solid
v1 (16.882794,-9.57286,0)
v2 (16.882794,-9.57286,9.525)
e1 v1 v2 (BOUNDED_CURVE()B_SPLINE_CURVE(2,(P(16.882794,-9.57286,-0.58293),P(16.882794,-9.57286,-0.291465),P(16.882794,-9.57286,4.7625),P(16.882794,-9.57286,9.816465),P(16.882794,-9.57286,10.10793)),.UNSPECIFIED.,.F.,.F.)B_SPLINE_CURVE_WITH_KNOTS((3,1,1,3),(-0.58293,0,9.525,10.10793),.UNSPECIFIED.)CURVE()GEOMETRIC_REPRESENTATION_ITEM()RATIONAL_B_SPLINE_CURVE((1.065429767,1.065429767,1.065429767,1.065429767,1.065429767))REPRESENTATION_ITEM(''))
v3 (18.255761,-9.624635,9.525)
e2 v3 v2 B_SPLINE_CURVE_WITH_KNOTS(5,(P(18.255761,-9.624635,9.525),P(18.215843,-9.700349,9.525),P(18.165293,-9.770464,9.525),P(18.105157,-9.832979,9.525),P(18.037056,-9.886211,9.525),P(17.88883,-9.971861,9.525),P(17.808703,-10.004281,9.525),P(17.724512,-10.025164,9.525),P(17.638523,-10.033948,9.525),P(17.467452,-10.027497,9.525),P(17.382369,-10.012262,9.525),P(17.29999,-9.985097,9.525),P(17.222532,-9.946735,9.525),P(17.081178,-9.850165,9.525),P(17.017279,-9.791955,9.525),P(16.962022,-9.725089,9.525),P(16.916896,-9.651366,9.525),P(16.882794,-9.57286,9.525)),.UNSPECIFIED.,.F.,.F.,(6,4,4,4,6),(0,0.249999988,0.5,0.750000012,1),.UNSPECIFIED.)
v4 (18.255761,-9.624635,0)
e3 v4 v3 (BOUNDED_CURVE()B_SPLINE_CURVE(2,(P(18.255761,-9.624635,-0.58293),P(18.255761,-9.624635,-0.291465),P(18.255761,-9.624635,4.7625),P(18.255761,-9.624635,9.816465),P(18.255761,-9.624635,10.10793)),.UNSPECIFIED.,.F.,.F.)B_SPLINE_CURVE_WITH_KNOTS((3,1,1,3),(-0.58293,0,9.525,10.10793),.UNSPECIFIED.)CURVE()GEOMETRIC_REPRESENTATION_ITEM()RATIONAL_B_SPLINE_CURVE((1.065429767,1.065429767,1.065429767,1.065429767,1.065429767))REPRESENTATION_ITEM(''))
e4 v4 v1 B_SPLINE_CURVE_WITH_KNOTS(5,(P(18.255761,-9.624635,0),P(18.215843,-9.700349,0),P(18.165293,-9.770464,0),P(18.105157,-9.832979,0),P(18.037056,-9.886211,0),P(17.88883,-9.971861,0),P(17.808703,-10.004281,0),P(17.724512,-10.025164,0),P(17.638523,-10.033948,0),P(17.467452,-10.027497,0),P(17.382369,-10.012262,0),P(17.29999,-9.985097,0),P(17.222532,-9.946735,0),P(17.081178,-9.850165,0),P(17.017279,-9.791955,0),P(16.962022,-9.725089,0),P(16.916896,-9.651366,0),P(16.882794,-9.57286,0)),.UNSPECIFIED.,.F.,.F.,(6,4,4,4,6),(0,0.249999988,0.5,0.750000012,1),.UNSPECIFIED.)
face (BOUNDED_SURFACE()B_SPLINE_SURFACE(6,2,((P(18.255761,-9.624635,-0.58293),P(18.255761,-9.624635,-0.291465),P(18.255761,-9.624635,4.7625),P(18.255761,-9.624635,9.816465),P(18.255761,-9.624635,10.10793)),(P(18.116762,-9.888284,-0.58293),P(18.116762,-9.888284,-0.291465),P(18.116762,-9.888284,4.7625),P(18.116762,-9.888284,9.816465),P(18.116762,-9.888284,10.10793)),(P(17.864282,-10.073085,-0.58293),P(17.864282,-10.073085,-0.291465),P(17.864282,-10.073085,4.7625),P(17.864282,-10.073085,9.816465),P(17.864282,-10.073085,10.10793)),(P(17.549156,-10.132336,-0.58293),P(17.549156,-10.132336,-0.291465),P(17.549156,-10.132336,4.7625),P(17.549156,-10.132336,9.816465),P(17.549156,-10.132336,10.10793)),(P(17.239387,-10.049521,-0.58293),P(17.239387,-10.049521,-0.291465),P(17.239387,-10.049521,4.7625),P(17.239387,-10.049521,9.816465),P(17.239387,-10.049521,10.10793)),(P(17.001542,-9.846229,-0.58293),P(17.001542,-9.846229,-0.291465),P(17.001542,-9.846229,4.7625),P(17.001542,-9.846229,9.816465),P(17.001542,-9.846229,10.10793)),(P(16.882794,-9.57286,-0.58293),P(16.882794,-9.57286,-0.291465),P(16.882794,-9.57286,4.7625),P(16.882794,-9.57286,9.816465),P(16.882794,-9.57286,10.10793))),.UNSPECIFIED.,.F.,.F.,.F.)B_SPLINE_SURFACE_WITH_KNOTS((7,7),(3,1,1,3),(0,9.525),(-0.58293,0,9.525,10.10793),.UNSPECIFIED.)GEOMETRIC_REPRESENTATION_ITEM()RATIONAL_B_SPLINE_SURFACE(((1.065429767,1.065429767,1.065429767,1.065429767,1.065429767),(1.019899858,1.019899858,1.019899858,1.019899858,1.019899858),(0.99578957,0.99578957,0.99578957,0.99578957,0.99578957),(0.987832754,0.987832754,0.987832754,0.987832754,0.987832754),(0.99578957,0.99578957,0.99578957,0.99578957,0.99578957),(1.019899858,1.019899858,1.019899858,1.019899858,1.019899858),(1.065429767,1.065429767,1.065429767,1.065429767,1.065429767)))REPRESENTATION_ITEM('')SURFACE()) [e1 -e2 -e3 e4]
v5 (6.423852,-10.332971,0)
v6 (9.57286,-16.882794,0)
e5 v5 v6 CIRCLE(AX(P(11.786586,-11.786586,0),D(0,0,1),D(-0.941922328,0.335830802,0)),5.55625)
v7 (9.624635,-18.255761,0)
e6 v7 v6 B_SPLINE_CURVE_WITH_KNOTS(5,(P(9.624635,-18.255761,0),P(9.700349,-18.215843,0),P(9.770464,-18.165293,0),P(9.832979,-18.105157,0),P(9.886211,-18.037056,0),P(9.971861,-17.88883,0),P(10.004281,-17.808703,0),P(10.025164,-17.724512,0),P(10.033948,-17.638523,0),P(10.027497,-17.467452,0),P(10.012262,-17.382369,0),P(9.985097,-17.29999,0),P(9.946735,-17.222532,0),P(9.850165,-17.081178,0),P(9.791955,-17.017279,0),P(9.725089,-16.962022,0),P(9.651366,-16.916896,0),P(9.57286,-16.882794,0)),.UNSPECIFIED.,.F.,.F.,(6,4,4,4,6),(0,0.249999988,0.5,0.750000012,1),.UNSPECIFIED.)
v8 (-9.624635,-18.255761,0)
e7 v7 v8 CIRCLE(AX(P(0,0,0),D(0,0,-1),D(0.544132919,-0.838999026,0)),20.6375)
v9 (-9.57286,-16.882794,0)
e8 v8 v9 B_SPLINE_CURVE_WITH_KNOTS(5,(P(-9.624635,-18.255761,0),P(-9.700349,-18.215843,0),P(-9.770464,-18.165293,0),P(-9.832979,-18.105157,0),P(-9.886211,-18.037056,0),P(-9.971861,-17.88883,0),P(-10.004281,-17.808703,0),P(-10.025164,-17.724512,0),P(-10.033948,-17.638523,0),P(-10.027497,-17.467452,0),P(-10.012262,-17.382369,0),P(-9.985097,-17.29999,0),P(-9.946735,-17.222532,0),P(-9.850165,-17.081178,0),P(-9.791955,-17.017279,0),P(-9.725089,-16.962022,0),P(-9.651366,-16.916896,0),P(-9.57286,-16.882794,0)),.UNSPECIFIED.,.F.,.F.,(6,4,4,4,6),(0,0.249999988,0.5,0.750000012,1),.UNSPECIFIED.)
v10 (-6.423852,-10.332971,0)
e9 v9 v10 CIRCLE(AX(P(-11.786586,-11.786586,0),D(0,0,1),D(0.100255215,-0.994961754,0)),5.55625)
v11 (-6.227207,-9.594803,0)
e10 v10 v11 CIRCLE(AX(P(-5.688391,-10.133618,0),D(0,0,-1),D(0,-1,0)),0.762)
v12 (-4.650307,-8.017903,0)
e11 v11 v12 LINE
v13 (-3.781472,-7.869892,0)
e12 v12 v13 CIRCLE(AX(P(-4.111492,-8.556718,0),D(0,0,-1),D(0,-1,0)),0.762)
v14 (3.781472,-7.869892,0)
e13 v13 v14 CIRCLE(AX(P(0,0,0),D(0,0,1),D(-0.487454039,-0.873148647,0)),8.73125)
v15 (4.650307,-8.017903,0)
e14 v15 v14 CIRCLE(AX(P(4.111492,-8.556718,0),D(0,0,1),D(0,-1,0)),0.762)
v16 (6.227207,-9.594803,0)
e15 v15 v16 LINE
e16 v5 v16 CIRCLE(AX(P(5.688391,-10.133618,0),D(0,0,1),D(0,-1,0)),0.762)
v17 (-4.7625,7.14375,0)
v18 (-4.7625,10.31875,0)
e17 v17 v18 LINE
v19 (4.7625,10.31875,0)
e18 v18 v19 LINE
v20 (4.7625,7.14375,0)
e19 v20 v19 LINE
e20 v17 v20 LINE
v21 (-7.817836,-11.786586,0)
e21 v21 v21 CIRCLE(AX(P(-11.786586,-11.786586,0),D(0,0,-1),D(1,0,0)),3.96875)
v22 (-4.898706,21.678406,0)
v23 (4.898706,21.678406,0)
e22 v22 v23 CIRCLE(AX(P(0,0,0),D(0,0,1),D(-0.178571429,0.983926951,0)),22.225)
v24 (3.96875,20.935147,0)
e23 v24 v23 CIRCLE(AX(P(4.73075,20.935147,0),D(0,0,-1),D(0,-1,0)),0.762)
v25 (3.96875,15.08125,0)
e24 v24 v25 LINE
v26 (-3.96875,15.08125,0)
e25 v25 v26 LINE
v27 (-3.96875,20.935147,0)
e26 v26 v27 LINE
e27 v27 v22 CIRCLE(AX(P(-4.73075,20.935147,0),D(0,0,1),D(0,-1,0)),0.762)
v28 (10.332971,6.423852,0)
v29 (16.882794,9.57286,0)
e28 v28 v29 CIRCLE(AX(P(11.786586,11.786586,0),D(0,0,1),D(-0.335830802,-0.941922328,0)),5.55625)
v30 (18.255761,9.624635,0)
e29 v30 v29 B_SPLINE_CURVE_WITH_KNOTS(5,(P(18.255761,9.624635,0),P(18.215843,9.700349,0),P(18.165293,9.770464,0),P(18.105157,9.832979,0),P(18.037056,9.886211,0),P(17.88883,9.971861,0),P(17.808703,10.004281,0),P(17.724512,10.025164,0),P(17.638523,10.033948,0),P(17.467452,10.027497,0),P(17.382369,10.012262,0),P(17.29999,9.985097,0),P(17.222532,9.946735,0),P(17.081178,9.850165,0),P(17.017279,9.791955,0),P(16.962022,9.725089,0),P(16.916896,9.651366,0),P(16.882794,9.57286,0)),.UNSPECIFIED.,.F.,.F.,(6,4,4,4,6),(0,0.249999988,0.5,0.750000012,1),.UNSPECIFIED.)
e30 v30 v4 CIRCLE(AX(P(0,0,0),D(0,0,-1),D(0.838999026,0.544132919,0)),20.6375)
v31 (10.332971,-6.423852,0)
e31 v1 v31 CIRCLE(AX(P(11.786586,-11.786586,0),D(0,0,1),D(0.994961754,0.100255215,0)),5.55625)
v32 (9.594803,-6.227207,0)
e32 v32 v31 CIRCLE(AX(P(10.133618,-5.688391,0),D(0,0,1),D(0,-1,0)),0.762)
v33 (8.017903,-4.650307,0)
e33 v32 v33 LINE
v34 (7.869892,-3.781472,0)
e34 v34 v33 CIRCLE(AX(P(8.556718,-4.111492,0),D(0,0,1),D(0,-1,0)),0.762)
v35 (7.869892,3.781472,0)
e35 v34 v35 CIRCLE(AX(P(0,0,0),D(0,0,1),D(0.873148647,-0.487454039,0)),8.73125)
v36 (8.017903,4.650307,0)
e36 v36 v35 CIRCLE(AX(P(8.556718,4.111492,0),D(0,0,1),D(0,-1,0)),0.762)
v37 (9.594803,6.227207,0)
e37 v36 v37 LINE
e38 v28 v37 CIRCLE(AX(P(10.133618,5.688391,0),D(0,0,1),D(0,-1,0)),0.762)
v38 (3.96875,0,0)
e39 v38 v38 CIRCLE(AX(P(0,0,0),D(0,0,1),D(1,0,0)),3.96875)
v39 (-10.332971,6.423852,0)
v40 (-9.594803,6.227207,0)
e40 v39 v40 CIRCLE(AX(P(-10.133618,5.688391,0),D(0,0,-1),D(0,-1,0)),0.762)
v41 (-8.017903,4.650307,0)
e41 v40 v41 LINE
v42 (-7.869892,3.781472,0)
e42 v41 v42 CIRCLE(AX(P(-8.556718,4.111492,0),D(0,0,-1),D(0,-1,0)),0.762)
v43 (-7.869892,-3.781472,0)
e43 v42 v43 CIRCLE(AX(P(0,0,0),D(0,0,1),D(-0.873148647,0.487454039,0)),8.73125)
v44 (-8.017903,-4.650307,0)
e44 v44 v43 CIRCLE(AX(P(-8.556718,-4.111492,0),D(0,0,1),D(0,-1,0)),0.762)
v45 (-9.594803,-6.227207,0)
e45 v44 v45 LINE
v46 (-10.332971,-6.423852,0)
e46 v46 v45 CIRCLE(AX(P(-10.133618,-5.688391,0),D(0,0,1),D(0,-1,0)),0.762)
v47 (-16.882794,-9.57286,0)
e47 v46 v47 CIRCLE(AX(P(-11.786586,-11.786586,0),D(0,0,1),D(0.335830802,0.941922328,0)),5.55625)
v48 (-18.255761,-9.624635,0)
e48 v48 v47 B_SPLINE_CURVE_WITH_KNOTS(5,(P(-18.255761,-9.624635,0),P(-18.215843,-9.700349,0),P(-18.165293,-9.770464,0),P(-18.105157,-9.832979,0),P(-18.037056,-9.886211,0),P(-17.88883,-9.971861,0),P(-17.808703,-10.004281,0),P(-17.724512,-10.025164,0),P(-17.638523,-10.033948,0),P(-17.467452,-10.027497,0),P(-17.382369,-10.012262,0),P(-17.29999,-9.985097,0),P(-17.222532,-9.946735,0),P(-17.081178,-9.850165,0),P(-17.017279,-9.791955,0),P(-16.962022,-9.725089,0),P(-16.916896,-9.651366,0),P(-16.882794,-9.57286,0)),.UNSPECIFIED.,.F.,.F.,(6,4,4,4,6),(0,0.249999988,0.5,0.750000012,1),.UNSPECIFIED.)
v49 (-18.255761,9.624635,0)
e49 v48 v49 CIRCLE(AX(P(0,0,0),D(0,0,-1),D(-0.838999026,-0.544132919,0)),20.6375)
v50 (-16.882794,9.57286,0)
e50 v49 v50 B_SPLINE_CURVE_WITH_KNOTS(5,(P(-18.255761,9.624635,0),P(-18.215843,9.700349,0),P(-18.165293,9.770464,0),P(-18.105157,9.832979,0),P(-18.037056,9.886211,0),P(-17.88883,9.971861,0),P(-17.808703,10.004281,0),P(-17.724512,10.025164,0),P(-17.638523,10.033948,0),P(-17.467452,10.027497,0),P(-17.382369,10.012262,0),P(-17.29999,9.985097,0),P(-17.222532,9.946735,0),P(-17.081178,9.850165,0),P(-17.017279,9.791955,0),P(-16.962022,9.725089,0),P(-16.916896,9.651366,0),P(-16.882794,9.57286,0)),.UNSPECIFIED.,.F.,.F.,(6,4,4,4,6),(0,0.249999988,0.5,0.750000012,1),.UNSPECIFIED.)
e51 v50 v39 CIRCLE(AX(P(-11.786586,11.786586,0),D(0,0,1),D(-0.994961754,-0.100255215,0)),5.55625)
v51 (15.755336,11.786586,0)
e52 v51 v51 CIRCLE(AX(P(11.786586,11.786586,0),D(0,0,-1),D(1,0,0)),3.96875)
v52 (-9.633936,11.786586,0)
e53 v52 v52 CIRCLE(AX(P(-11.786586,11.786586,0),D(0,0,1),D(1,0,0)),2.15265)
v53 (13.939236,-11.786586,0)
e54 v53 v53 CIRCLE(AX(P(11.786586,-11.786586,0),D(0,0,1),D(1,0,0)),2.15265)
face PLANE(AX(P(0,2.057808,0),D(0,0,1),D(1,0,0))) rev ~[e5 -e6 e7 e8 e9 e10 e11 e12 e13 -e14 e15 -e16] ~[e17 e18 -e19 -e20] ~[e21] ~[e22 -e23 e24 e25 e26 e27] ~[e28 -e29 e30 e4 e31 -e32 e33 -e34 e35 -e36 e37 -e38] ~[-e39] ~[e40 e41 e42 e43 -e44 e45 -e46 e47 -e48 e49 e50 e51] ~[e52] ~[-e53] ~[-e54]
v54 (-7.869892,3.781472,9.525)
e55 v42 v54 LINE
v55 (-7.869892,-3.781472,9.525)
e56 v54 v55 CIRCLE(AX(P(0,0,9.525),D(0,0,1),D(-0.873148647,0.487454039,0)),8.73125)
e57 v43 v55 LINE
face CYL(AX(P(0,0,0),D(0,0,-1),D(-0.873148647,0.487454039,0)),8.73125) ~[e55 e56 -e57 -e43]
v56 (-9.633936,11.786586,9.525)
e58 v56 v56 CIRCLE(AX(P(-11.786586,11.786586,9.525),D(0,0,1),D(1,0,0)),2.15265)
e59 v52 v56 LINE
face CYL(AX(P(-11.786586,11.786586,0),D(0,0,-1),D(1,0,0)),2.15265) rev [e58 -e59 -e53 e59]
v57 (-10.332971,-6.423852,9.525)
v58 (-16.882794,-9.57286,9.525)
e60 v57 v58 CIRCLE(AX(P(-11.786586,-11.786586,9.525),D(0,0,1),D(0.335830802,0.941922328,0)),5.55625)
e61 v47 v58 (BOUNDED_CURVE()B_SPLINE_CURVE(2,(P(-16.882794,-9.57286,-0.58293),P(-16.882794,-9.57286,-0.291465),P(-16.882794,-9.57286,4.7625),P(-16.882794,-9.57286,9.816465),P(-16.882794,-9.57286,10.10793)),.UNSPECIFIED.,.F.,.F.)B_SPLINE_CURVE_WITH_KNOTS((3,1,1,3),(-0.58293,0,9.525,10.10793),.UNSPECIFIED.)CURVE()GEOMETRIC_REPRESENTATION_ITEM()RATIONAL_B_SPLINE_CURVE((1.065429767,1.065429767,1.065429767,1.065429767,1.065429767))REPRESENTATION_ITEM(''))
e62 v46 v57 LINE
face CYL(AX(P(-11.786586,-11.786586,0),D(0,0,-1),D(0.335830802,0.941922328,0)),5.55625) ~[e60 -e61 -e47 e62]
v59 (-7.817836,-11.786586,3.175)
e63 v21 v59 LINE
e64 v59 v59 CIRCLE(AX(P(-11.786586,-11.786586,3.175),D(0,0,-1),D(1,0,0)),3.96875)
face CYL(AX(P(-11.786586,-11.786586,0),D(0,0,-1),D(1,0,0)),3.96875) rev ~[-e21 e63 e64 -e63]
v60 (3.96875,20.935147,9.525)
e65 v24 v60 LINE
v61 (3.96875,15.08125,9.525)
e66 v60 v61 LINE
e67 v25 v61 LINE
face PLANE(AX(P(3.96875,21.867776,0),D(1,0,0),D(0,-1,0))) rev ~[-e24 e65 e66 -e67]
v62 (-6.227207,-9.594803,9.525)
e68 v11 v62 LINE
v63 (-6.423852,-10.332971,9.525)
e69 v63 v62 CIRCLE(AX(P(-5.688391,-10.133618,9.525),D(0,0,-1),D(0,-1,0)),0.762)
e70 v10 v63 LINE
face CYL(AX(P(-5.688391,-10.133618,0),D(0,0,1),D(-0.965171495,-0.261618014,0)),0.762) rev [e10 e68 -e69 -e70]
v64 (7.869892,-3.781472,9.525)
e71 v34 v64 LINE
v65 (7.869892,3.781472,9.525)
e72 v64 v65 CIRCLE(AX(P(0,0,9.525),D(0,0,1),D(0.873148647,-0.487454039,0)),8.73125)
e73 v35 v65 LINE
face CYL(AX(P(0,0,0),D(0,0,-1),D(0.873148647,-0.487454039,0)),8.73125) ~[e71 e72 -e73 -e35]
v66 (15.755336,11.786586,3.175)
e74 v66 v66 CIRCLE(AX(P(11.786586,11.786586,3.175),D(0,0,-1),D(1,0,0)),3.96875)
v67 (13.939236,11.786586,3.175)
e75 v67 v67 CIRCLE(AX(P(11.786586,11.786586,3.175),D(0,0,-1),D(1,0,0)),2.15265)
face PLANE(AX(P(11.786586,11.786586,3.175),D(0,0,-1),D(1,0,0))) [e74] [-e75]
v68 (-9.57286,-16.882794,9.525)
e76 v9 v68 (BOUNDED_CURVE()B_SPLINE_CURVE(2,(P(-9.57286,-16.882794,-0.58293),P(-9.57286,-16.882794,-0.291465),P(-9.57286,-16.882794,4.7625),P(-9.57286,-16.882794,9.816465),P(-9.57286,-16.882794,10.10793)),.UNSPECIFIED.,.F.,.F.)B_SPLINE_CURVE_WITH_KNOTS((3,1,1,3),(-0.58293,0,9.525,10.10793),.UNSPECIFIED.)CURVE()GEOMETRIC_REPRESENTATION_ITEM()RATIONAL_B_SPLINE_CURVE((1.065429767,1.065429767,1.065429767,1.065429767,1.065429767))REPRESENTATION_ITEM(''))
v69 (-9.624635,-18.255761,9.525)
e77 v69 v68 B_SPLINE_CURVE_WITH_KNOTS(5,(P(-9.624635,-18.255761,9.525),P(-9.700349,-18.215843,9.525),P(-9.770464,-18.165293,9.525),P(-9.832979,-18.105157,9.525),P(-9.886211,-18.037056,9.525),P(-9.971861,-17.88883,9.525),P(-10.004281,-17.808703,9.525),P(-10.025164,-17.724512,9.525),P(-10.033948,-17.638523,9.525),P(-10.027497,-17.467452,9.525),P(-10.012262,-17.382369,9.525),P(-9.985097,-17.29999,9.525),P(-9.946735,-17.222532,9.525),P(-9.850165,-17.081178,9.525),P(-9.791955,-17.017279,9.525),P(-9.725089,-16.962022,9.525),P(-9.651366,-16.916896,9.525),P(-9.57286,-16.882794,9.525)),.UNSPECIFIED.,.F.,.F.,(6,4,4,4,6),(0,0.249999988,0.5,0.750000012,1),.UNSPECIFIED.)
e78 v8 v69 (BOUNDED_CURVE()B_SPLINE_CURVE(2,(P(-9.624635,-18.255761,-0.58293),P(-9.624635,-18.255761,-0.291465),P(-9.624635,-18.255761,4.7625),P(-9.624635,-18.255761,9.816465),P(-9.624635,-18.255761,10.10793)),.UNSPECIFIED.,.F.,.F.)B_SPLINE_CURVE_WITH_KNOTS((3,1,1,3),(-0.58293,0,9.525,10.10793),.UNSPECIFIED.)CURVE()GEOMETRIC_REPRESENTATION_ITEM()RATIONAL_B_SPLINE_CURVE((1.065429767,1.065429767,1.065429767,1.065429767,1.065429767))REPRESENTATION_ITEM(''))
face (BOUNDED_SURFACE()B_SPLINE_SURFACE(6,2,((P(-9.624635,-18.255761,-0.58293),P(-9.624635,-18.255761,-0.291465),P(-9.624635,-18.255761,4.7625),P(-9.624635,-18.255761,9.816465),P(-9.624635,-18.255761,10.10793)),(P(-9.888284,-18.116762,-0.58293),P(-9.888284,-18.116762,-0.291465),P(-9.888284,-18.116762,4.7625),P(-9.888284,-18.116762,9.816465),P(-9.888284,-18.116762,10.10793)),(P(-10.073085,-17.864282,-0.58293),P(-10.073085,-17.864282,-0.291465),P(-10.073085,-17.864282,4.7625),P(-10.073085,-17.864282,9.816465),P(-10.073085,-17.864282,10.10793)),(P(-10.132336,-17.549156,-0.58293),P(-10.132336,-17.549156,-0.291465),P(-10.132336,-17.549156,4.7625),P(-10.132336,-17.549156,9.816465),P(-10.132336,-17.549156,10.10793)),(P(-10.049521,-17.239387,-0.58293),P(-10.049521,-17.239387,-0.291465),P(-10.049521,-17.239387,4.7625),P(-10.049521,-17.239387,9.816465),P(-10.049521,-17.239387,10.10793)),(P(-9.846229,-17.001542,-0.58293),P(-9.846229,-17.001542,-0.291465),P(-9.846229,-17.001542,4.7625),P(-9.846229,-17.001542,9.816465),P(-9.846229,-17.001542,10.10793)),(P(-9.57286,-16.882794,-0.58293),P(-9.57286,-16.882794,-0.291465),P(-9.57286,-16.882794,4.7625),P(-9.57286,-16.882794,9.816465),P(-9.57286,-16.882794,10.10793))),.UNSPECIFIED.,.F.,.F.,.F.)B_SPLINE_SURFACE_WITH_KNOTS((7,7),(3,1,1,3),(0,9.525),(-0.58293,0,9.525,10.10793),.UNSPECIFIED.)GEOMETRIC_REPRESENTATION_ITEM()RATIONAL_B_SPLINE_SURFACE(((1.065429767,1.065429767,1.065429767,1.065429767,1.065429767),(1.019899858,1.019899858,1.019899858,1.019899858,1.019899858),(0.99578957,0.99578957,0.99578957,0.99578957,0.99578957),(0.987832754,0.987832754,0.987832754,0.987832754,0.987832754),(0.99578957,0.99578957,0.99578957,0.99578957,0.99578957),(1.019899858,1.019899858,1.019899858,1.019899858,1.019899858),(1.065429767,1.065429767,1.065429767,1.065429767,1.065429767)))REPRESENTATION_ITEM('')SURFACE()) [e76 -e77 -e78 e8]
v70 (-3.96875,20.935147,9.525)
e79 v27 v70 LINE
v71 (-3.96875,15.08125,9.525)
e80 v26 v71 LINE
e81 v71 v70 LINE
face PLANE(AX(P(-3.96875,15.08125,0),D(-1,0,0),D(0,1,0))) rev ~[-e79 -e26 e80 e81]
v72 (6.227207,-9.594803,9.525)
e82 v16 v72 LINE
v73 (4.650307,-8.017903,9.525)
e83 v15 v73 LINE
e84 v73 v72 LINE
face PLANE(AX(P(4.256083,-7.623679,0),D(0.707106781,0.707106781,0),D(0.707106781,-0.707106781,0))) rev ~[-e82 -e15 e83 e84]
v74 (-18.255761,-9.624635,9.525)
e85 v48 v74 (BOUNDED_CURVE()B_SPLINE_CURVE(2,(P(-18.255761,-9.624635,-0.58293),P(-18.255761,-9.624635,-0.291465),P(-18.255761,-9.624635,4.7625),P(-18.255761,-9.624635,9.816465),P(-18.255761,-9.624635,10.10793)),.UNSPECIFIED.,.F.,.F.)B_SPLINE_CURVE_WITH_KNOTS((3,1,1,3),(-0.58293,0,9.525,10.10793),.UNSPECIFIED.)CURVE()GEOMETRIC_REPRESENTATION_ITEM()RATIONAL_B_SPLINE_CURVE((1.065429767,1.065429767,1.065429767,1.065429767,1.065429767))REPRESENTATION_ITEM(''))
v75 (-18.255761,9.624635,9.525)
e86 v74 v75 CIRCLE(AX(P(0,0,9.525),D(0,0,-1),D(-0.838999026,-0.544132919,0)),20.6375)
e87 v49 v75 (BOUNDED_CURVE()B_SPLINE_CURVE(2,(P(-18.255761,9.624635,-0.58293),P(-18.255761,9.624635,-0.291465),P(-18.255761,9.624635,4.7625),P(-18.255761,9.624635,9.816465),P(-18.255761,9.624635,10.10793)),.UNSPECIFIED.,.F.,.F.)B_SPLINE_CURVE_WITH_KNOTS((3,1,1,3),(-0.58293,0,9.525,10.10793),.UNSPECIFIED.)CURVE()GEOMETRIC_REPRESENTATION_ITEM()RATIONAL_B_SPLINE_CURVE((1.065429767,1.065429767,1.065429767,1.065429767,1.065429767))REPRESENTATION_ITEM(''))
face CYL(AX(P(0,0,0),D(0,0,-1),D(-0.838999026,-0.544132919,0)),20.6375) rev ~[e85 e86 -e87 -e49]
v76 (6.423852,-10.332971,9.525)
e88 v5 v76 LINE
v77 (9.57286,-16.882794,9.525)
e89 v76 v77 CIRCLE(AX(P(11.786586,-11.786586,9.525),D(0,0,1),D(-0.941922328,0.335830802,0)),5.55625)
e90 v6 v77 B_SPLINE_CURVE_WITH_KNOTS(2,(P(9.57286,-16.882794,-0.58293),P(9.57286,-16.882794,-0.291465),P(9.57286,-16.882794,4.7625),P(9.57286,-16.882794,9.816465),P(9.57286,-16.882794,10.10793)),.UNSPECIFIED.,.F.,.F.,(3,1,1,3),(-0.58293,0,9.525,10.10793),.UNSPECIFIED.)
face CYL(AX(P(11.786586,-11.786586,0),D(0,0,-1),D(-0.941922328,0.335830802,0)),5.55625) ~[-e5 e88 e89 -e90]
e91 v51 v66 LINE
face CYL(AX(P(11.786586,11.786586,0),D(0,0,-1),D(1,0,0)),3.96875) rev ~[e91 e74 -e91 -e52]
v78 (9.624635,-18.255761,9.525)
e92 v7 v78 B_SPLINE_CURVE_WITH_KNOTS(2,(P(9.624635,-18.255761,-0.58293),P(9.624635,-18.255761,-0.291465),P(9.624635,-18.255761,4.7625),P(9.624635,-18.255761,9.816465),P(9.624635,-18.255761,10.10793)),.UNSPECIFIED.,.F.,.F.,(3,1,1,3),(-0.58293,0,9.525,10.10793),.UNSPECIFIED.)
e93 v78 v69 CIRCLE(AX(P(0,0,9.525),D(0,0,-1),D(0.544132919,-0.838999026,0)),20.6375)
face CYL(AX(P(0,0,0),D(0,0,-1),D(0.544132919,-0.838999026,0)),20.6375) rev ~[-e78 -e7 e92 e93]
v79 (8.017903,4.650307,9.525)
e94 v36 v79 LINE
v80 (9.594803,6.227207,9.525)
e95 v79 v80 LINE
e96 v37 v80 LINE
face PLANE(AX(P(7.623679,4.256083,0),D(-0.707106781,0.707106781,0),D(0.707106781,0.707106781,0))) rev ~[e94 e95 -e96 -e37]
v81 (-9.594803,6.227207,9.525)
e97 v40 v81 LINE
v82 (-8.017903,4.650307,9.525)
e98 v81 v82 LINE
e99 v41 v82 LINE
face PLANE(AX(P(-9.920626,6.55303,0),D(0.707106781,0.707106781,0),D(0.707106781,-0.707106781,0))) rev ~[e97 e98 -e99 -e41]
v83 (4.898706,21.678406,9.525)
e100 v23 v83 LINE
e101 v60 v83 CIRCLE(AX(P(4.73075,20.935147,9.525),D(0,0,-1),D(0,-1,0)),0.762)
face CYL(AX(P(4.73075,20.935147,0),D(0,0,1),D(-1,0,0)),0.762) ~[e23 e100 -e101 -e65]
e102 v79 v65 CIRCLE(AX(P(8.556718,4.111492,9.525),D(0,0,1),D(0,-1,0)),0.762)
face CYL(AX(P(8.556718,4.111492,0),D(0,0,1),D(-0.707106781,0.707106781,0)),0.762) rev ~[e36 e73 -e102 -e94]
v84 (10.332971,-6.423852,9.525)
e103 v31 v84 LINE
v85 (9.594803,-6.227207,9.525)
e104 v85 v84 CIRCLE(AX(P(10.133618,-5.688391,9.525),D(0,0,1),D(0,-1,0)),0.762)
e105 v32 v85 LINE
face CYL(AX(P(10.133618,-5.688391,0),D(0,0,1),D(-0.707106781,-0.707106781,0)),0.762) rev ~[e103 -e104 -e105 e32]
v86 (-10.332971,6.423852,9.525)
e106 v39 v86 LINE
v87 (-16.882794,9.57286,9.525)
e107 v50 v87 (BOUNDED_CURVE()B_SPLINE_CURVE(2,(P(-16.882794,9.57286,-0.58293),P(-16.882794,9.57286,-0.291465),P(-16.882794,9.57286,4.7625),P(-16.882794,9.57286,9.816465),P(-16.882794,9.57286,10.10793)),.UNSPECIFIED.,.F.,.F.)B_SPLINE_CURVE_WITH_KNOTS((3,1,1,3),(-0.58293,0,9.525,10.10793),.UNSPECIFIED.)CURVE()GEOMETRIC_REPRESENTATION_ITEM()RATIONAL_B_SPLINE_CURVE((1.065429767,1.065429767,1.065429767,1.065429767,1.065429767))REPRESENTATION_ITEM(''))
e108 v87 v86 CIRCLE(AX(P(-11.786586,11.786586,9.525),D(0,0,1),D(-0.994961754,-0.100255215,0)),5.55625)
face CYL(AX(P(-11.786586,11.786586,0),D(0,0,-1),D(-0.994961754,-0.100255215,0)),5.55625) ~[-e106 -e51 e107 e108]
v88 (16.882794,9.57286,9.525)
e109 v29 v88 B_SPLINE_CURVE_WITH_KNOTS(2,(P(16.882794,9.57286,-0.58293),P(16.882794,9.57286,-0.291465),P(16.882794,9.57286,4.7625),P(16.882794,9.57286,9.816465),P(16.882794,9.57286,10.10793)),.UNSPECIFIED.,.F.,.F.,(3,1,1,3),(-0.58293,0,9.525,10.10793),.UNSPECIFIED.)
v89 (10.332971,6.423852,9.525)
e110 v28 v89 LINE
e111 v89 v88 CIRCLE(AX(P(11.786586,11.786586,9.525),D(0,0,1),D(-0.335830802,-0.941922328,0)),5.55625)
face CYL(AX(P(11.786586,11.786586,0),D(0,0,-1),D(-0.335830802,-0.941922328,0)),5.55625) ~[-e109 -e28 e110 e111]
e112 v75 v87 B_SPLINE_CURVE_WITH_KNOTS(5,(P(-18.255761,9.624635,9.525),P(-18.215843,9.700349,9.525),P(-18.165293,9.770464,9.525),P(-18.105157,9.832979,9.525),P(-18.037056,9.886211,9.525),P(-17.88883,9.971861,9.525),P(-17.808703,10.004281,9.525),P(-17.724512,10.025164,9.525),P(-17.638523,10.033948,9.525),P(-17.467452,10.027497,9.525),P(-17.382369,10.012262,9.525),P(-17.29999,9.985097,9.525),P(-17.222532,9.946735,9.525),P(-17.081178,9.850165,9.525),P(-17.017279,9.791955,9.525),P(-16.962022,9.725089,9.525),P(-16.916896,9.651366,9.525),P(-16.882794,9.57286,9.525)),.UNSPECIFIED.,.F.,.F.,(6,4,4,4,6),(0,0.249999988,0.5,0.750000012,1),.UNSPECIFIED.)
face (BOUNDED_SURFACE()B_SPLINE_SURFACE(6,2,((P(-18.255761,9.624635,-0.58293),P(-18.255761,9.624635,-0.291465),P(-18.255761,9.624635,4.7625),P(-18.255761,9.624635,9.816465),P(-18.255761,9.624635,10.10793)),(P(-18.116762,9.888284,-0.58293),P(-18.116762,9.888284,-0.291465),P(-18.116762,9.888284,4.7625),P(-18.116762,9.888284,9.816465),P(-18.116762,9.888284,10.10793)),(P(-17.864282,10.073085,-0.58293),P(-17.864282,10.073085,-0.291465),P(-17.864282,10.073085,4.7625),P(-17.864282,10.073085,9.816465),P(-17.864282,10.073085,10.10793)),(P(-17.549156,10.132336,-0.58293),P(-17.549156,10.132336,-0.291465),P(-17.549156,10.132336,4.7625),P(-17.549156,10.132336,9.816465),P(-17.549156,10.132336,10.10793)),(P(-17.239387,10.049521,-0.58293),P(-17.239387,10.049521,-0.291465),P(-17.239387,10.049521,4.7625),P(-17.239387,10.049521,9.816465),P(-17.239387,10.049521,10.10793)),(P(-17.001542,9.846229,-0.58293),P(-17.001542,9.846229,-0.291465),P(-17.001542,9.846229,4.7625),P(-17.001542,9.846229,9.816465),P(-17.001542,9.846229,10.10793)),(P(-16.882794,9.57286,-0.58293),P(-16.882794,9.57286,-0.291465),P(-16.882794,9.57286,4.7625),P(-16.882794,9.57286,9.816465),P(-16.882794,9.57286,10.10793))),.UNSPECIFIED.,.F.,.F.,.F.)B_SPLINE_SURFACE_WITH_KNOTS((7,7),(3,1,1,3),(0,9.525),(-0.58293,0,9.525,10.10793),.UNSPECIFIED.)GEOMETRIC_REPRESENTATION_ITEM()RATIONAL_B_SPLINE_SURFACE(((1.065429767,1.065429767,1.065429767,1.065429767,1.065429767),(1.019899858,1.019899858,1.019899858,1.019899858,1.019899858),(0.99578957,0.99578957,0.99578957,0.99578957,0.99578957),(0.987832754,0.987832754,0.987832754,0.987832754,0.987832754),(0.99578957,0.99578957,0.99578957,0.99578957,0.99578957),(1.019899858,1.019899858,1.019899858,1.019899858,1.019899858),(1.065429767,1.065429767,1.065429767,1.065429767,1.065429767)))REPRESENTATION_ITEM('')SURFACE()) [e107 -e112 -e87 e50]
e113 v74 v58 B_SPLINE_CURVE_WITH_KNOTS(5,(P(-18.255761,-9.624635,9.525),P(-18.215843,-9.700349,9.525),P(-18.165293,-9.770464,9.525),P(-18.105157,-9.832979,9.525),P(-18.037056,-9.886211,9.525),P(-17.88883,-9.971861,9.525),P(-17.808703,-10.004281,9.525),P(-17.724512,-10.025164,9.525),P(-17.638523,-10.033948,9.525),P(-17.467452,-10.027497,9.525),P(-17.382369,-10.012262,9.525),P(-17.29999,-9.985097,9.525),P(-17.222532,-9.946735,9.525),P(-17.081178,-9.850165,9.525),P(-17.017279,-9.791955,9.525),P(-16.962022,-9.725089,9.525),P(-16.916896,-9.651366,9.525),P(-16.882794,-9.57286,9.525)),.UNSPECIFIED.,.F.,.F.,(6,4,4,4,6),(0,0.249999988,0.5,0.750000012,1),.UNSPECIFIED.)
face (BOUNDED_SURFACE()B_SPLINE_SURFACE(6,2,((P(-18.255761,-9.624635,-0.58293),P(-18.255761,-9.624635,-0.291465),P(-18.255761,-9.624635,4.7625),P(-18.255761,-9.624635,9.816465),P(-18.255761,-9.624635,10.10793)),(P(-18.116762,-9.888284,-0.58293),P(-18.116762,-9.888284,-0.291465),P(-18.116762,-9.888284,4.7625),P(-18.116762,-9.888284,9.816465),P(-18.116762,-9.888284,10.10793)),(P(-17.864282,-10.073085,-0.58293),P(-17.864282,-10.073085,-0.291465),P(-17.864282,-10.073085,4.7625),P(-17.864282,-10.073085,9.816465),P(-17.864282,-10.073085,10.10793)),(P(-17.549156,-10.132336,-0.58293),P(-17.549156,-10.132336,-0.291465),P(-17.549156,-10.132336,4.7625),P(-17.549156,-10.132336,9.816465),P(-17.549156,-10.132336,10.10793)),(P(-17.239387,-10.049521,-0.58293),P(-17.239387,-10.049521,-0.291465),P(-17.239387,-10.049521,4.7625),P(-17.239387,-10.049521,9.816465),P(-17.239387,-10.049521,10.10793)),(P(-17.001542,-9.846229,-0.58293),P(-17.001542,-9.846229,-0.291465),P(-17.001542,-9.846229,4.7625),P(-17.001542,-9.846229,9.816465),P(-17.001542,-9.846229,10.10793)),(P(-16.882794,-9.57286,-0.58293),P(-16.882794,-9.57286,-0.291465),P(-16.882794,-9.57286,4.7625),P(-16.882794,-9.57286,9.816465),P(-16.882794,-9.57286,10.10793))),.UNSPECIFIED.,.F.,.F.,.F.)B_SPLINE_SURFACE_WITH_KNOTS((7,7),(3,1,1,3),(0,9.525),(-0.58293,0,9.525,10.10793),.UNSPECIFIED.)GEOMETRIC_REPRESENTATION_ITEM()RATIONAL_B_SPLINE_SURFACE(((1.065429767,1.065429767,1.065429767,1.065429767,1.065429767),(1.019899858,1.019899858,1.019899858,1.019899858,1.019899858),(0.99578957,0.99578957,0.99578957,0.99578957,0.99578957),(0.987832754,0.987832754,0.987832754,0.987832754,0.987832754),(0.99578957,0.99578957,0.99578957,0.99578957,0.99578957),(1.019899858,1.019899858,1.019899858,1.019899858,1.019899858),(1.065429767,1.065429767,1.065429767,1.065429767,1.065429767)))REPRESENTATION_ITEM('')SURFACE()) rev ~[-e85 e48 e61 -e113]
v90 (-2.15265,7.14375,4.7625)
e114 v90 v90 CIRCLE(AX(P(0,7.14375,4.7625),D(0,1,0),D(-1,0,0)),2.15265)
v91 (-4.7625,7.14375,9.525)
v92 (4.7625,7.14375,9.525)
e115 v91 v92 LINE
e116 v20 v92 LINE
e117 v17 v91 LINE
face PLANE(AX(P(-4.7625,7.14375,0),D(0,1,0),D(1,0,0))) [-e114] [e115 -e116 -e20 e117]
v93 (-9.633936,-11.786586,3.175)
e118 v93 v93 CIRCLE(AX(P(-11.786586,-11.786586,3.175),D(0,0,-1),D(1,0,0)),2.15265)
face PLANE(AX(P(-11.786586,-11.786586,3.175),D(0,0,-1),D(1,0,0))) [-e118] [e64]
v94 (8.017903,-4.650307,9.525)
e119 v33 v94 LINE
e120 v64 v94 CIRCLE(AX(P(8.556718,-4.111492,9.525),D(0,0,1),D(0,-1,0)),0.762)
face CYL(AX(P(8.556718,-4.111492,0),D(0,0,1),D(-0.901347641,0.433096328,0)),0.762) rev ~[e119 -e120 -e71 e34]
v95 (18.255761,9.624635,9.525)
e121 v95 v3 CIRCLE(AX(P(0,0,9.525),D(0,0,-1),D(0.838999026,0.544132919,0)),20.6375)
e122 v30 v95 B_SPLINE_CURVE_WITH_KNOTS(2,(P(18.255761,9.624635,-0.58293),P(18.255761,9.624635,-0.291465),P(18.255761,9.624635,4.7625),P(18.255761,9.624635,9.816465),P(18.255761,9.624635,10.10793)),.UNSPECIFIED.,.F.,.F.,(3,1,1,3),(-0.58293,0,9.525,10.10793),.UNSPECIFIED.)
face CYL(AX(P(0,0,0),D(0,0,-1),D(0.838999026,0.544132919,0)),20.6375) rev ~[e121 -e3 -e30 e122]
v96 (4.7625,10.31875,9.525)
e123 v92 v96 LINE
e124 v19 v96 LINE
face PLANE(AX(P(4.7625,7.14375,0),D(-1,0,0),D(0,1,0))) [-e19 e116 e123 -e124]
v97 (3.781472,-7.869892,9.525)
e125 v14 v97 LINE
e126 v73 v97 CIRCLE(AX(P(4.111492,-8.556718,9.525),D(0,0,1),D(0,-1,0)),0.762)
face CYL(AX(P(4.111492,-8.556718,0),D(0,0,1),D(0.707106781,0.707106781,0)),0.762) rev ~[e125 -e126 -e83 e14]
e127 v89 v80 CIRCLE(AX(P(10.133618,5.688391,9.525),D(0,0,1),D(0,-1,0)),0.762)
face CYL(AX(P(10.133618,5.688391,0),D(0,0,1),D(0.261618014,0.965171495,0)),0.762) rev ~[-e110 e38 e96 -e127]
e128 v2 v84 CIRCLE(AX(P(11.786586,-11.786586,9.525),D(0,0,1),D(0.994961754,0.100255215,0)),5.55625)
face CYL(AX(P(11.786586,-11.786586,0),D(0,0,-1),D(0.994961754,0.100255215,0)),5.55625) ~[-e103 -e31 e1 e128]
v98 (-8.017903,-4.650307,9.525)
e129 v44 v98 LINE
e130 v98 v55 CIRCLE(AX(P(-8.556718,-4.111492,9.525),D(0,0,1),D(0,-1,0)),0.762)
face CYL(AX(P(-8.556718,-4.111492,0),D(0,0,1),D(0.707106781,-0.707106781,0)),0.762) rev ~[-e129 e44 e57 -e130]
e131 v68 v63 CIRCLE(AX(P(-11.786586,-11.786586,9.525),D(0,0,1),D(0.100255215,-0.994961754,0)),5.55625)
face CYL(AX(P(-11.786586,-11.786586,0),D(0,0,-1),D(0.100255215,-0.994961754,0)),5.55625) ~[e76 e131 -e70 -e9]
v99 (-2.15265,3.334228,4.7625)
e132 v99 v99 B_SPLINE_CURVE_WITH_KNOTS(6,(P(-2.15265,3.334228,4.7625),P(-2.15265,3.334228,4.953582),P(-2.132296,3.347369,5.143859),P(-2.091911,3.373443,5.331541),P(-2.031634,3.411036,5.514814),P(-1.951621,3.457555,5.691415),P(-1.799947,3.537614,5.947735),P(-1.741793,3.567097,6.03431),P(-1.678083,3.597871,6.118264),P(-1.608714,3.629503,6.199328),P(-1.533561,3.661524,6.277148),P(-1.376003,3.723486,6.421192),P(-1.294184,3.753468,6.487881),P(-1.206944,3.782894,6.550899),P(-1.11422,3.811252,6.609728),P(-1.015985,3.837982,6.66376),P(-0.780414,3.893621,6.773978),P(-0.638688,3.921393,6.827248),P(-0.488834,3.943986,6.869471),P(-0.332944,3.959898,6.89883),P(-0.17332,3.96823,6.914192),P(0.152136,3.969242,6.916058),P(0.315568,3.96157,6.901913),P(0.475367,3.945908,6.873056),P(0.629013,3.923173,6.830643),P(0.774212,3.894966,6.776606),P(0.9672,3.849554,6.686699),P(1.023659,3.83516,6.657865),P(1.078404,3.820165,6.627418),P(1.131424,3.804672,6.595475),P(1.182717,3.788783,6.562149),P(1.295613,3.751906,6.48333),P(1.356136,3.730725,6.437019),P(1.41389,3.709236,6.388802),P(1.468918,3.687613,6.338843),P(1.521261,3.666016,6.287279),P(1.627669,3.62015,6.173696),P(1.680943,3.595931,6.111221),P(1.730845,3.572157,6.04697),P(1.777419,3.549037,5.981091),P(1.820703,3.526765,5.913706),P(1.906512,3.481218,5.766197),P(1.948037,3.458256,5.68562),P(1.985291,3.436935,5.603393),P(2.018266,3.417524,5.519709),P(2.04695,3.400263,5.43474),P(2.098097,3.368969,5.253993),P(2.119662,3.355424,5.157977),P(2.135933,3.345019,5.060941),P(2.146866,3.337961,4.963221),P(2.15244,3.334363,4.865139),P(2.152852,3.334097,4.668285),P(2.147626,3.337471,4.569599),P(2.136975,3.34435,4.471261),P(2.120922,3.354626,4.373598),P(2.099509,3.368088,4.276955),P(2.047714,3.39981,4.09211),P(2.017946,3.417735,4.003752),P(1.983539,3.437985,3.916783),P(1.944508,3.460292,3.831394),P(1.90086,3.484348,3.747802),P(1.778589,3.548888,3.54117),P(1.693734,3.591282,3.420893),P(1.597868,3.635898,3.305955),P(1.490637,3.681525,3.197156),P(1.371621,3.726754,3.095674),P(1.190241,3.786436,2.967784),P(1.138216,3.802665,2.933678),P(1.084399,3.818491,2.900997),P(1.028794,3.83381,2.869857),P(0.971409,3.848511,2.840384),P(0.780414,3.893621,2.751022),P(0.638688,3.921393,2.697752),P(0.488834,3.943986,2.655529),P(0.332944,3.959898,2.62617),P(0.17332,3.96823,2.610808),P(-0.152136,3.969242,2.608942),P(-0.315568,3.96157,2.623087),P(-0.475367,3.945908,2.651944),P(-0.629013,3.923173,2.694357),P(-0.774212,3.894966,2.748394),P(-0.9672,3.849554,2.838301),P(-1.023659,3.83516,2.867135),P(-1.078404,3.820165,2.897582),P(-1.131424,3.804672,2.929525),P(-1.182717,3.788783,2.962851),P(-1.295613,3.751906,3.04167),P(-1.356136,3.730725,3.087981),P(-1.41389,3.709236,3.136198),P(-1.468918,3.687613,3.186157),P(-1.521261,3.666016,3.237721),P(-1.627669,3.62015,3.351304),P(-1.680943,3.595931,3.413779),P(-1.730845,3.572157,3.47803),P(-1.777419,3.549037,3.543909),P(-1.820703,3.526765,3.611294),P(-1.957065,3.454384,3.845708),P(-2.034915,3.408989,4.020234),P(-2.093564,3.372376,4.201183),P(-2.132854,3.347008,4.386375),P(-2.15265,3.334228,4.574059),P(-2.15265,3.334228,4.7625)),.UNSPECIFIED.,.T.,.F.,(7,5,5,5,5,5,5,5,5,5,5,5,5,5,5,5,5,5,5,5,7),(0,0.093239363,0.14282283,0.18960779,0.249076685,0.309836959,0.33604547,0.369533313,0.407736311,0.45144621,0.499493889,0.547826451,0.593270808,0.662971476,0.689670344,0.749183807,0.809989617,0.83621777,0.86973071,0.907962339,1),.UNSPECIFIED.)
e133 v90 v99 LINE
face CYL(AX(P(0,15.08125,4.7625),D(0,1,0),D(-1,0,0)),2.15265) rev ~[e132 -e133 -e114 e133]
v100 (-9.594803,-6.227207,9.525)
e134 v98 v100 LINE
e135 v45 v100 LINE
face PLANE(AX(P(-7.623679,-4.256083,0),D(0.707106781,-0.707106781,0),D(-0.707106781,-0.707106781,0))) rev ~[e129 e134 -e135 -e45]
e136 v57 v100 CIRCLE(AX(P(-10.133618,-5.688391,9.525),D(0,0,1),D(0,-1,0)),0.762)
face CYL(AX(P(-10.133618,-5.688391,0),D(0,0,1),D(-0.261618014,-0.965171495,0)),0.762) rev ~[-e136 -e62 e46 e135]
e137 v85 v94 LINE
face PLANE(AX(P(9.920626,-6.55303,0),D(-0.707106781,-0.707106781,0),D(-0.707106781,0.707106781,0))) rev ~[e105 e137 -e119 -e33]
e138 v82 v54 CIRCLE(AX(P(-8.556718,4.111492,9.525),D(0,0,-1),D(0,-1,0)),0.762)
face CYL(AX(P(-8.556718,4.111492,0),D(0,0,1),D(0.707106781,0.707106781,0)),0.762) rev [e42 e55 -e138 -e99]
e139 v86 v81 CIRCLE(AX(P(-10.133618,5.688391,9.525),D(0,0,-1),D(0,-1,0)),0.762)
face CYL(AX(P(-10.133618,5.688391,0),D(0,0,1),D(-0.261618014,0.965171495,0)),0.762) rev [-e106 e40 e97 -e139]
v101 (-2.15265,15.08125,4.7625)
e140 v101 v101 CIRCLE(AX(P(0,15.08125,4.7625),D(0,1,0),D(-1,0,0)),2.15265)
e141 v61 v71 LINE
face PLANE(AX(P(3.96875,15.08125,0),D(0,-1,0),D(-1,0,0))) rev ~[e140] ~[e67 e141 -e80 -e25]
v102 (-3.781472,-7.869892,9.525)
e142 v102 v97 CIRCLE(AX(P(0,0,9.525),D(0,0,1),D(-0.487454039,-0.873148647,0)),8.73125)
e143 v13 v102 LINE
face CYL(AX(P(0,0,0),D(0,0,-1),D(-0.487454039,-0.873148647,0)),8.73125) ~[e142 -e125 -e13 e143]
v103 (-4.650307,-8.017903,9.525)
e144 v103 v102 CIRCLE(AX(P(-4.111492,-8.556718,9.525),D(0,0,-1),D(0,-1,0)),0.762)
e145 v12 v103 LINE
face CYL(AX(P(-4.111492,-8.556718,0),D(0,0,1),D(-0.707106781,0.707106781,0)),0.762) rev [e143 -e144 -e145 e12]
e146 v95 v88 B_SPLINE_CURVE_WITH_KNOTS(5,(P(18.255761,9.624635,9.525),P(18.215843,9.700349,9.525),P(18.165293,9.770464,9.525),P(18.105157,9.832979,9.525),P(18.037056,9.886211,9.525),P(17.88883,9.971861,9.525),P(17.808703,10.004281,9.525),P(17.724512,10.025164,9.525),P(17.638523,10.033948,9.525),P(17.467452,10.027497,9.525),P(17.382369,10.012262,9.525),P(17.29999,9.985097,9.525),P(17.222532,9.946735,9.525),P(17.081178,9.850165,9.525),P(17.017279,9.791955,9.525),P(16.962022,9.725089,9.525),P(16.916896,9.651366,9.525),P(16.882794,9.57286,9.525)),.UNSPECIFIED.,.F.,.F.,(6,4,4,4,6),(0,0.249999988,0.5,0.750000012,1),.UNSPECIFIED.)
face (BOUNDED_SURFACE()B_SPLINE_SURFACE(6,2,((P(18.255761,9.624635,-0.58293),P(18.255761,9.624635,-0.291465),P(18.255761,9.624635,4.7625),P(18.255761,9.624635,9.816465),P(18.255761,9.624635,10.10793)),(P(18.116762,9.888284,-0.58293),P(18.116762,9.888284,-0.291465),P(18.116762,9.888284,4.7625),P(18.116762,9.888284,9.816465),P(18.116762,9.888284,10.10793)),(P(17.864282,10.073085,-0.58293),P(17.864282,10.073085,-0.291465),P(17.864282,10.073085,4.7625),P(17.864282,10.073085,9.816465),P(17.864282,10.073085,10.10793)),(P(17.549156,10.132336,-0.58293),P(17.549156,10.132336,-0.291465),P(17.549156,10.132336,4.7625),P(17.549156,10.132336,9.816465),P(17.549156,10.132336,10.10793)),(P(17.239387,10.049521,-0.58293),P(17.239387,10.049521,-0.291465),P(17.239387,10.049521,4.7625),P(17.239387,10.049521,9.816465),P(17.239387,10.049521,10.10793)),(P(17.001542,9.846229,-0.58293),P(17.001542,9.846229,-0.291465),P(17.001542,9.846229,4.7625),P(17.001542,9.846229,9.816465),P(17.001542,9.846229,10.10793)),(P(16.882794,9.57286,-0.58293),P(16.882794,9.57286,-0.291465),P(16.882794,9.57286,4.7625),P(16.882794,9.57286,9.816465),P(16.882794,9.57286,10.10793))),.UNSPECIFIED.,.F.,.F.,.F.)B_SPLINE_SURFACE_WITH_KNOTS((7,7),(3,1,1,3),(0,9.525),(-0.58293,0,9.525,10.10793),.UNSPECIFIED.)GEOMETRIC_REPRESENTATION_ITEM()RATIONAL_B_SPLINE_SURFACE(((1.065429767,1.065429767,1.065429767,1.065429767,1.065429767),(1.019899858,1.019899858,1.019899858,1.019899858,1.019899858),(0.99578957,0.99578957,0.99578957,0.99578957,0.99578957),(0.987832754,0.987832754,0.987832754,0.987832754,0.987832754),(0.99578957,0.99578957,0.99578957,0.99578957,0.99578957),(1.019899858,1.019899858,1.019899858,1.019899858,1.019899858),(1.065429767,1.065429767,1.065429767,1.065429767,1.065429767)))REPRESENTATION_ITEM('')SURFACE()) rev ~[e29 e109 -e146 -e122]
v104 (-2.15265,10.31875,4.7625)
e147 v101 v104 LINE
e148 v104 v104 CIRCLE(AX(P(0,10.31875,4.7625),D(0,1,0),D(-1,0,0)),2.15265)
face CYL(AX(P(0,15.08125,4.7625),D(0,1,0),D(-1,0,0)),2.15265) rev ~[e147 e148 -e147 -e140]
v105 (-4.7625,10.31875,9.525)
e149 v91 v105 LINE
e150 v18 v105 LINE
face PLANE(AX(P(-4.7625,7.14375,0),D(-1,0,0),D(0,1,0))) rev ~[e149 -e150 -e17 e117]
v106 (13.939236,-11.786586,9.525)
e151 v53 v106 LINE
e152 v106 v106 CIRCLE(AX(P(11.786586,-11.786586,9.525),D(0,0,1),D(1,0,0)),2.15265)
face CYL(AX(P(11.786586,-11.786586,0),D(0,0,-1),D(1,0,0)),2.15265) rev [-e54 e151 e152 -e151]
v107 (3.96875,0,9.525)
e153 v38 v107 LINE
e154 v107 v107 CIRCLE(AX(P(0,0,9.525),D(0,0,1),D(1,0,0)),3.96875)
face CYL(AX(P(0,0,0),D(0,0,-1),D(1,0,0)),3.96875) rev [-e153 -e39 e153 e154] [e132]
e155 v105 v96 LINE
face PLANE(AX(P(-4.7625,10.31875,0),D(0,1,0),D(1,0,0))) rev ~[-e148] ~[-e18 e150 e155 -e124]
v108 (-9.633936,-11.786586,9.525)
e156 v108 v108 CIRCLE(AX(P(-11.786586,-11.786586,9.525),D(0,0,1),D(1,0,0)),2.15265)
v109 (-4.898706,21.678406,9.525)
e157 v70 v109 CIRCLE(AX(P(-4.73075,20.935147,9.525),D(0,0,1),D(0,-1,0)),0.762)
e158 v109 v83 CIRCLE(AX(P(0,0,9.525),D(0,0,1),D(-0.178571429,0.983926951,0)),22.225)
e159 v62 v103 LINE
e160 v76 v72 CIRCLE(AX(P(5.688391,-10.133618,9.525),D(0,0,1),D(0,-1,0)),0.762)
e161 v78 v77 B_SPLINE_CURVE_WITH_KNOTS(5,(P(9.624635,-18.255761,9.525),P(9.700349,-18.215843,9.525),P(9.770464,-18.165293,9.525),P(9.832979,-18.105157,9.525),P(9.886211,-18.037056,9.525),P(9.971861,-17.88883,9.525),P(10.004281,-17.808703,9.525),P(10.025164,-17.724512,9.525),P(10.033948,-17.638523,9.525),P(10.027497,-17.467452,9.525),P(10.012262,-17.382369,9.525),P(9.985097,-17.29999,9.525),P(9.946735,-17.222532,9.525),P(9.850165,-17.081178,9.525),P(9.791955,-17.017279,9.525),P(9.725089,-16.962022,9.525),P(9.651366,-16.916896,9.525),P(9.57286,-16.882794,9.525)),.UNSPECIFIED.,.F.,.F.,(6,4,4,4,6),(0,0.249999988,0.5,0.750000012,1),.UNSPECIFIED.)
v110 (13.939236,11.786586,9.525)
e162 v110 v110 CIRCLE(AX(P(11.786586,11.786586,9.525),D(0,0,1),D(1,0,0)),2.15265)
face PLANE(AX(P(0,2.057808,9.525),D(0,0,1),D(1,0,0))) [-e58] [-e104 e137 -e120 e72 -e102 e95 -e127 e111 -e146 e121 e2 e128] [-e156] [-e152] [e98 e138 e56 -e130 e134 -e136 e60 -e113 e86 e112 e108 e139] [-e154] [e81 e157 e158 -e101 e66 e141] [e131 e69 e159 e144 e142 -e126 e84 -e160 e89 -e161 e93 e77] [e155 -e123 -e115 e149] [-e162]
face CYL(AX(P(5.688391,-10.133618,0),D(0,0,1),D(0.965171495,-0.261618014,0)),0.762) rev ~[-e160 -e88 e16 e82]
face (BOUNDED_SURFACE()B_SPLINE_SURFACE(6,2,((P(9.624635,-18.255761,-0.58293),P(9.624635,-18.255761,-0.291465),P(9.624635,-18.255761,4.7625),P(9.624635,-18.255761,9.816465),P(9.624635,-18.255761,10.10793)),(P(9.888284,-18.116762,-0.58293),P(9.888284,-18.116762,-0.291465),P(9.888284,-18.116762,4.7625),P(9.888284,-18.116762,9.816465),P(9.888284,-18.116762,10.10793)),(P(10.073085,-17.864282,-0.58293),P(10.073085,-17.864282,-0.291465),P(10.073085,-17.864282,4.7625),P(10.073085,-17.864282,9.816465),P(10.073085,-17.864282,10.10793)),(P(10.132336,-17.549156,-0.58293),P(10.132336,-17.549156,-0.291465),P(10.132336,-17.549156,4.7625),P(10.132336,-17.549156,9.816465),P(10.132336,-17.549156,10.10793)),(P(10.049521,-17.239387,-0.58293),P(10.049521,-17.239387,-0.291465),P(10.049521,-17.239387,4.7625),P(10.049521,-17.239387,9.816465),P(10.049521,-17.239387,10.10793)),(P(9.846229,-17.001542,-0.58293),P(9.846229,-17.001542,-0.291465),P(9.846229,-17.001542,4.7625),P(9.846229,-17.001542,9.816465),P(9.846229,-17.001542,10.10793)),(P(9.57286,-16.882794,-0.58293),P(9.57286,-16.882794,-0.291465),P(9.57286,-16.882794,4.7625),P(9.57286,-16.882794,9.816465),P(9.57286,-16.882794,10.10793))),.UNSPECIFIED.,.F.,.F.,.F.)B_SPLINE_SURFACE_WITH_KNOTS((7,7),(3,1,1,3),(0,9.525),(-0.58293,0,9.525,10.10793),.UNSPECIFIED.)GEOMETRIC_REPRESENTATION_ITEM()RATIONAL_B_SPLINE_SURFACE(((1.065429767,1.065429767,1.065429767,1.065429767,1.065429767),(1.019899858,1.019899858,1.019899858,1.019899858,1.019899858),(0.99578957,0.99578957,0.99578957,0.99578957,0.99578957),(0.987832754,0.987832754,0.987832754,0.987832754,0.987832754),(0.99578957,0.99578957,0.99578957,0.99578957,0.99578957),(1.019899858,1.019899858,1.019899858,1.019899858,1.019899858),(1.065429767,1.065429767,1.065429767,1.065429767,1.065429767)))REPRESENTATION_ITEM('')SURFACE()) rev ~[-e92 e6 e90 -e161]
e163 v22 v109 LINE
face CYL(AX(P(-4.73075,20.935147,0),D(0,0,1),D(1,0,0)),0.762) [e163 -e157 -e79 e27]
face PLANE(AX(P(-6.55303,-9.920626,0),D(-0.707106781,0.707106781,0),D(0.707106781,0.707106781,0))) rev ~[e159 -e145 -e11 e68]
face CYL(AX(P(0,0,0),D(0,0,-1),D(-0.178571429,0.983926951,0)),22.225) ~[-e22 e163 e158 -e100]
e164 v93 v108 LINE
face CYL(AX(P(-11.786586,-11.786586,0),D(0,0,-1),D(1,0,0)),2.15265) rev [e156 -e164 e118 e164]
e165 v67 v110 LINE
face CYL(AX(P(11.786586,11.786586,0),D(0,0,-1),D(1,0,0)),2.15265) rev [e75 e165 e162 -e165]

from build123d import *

# Parameters (mm, degrees)
F0_R            = 2.15265
F0_R_2          = 3.96875
F0_W            = 9.525
F0_H            = 3.175
F1_DEPTH        = 9.525
F2_R            = 2.15265
F3_REACH        = 43.3958636501
F5_R            = 3.96875
F6_DEPTH        = 3.175
F8_DEPTH        = 9.525
F8_COPIES_COUNT = 3
F8_COPIES_ANGLE = 180
F9_R            = 0.762


# Not quite as in the source:
# - a feature of the source that left no trace in its solid (it failed there, or was rolled back) is left out
# - a pattern or mirror of a feature is missing from the dataset's text; its kind, count and spacing are read off the source's solid


with BuildPart() as f1:
    # F0 (on Top) → F1 (new body)
    with BuildSketch(Plane.XY):
        with BuildLine():
            Line((3.96875, 15.08125), (-3.96875, 15.08125))
            Line((-3.96875, 15.08125), (-3.96875, 21.8677764859))
            ThreePointArc((-3.96875, 21.8677764859), (0, -22.225), (3.96875, 21.8677764859))
            Line((3.96875, 21.8677764859), (3.96875, 15.08125))
        make_face()
        with Locations((-11.7865861589, -11.7865861589)):
            Circle(F0_R, mode=Mode.SUBTRACT)
        with Locations((11.7865861589, -11.7865861589)):
            Circle(F0_R, mode=Mode.SUBTRACT)
        with Locations((-11.7865861589, 11.7865861589)):
            Circle(F0_R, mode=Mode.SUBTRACT)
        Circle(F0_R_2, mode=Mode.SUBTRACT)
        with Locations((0, 8.73125)):
            Rectangle(F0_W, F0_H, mode=Mode.SUBTRACT)
        with Locations((11.7865861589, 11.7865861589)):
            Circle(F0_R, mode=Mode.SUBTRACT)
    extrude(amount=F1_DEPTH)

    f3_end = f1.faces().sort_by_distance((-3.96875, 0, 4.7625))[0]
    # F2 (on face) → F3 (cut, up to a face of the model that its end follows)
    with BuildSketch(Plane(origin=(0, 15.08125, 0), x_dir=(-1, 0, 0), z_dir=(0, 1, 0))):
        with Locations((0, 4.7625)):
            Circle(F2_R)
    f3_long = extrude(amount=-F3_REACH, mode=Mode.PRIVATE)
    add(split(f3_long, bisect_by=f3_end, keep=Keep.ALL, mode=Mode.PRIVATE).solids().sort_by_distance((0, 15.08125, 4.7625))[0], mode=Mode.SUBTRACT)

    # F5 (on face) → F6 (cut, through all)
    with BuildSketch(Plane(origin=(0, 0, 0), x_dir=(1, 0, 0), z_dir=(0, 0, -1))):
        with Locations((11.7865861589, -11.7865861589)):
            Circle(F5_R)
        with Locations((-11.7865861589, 11.7865861589)):
            Circle(F5_R)
    extrude(amount=-F6_DEPTH, mode=Mode.SUBTRACT)

    # F7 (on face) → F8 (cut, through all)
    with BuildSketch(Plane(origin=(0, 0, 0), x_dir=(1, 0, 0), z_dir=(0, 0, -1))):
        with BuildLine():
            ThreePointArc((-17.3148424047, -11.229543123), (-14.7565267097, -7.0906978311), (-9.9206262673, -6.5530302219))
            Line((-9.9206262673, -6.5530302219), (-7.6236791242, -4.2560830788))
            ThreePointArc((-7.6236791242, -4.2560830788), (-8.73125, 0), (-7.6236791242, 4.2560830788))
            Line((-7.6236791242, 4.2560830788), (-9.9206262673, 6.5530302219))
            ThreePointArc((-9.9206262673, 6.5530302219), (-14.7565267097, 7.0906978311), (-17.3148424047, 11.229543123))
            ThreePointArc((-17.3148424047, 11.229543123), (-20.6375, 0), (-17.3148424047, -11.229543123))
        make_face()
    f8 = extrude(amount=-F8_DEPTH, mode=Mode.SUBTRACT)

    # F8_copies: F8 ×3 about axis
    f8_copies_axis = Axis((0, 0, 0), (0, 0, 1))
    for i in range(1, F8_COPIES_COUNT):
        add(f8.rotate(f8_copies_axis, i * F8_COPIES_ANGLE / (F8_COPIES_COUNT - 1)), mode=Mode.SUBTRACT)

    # F9
    f9_edges = [f1.edges().sort_by_distance(p)[0] for p in [
        (-17.314842, -11.229543, 4.7625),
        (-9.920626, -6.55303, 4.7625),
        (-7.623679, -4.256083, 4.7625),
        (-7.623679, 4.256083, 4.7625),
        (-9.920626, 6.55303, 4.7625),
        (-17.314842, 11.229543, 4.7625),
        (3.96875, 21.867776, 4.7625),
        (-3.96875, 21.867776, 4.7625),
        (11.229543, -17.314842, 4.7625),
        (-11.229543, -17.314842, 4.7625),
        (6.55303, -9.920626, 4.7625),
        (-6.55303, -9.920626, 4.7625),
        (4.256083, -7.623679, 4.7625),
        (-4.256083, -7.623679, 4.7625),
        (17.314842, 11.229543, 4.7625),
        (17.314842, -11.229543, 4.7625),
        (9.920626, 6.55303, 4.7625),
        (7.623679, 4.256083, 4.7625),
        (7.623679, -4.256083, 4.7625),
        (9.920626, -6.55303, 4.7625),
    ]]
    fillet(f9_edges, radius=F9_R)


solid = f1.part
